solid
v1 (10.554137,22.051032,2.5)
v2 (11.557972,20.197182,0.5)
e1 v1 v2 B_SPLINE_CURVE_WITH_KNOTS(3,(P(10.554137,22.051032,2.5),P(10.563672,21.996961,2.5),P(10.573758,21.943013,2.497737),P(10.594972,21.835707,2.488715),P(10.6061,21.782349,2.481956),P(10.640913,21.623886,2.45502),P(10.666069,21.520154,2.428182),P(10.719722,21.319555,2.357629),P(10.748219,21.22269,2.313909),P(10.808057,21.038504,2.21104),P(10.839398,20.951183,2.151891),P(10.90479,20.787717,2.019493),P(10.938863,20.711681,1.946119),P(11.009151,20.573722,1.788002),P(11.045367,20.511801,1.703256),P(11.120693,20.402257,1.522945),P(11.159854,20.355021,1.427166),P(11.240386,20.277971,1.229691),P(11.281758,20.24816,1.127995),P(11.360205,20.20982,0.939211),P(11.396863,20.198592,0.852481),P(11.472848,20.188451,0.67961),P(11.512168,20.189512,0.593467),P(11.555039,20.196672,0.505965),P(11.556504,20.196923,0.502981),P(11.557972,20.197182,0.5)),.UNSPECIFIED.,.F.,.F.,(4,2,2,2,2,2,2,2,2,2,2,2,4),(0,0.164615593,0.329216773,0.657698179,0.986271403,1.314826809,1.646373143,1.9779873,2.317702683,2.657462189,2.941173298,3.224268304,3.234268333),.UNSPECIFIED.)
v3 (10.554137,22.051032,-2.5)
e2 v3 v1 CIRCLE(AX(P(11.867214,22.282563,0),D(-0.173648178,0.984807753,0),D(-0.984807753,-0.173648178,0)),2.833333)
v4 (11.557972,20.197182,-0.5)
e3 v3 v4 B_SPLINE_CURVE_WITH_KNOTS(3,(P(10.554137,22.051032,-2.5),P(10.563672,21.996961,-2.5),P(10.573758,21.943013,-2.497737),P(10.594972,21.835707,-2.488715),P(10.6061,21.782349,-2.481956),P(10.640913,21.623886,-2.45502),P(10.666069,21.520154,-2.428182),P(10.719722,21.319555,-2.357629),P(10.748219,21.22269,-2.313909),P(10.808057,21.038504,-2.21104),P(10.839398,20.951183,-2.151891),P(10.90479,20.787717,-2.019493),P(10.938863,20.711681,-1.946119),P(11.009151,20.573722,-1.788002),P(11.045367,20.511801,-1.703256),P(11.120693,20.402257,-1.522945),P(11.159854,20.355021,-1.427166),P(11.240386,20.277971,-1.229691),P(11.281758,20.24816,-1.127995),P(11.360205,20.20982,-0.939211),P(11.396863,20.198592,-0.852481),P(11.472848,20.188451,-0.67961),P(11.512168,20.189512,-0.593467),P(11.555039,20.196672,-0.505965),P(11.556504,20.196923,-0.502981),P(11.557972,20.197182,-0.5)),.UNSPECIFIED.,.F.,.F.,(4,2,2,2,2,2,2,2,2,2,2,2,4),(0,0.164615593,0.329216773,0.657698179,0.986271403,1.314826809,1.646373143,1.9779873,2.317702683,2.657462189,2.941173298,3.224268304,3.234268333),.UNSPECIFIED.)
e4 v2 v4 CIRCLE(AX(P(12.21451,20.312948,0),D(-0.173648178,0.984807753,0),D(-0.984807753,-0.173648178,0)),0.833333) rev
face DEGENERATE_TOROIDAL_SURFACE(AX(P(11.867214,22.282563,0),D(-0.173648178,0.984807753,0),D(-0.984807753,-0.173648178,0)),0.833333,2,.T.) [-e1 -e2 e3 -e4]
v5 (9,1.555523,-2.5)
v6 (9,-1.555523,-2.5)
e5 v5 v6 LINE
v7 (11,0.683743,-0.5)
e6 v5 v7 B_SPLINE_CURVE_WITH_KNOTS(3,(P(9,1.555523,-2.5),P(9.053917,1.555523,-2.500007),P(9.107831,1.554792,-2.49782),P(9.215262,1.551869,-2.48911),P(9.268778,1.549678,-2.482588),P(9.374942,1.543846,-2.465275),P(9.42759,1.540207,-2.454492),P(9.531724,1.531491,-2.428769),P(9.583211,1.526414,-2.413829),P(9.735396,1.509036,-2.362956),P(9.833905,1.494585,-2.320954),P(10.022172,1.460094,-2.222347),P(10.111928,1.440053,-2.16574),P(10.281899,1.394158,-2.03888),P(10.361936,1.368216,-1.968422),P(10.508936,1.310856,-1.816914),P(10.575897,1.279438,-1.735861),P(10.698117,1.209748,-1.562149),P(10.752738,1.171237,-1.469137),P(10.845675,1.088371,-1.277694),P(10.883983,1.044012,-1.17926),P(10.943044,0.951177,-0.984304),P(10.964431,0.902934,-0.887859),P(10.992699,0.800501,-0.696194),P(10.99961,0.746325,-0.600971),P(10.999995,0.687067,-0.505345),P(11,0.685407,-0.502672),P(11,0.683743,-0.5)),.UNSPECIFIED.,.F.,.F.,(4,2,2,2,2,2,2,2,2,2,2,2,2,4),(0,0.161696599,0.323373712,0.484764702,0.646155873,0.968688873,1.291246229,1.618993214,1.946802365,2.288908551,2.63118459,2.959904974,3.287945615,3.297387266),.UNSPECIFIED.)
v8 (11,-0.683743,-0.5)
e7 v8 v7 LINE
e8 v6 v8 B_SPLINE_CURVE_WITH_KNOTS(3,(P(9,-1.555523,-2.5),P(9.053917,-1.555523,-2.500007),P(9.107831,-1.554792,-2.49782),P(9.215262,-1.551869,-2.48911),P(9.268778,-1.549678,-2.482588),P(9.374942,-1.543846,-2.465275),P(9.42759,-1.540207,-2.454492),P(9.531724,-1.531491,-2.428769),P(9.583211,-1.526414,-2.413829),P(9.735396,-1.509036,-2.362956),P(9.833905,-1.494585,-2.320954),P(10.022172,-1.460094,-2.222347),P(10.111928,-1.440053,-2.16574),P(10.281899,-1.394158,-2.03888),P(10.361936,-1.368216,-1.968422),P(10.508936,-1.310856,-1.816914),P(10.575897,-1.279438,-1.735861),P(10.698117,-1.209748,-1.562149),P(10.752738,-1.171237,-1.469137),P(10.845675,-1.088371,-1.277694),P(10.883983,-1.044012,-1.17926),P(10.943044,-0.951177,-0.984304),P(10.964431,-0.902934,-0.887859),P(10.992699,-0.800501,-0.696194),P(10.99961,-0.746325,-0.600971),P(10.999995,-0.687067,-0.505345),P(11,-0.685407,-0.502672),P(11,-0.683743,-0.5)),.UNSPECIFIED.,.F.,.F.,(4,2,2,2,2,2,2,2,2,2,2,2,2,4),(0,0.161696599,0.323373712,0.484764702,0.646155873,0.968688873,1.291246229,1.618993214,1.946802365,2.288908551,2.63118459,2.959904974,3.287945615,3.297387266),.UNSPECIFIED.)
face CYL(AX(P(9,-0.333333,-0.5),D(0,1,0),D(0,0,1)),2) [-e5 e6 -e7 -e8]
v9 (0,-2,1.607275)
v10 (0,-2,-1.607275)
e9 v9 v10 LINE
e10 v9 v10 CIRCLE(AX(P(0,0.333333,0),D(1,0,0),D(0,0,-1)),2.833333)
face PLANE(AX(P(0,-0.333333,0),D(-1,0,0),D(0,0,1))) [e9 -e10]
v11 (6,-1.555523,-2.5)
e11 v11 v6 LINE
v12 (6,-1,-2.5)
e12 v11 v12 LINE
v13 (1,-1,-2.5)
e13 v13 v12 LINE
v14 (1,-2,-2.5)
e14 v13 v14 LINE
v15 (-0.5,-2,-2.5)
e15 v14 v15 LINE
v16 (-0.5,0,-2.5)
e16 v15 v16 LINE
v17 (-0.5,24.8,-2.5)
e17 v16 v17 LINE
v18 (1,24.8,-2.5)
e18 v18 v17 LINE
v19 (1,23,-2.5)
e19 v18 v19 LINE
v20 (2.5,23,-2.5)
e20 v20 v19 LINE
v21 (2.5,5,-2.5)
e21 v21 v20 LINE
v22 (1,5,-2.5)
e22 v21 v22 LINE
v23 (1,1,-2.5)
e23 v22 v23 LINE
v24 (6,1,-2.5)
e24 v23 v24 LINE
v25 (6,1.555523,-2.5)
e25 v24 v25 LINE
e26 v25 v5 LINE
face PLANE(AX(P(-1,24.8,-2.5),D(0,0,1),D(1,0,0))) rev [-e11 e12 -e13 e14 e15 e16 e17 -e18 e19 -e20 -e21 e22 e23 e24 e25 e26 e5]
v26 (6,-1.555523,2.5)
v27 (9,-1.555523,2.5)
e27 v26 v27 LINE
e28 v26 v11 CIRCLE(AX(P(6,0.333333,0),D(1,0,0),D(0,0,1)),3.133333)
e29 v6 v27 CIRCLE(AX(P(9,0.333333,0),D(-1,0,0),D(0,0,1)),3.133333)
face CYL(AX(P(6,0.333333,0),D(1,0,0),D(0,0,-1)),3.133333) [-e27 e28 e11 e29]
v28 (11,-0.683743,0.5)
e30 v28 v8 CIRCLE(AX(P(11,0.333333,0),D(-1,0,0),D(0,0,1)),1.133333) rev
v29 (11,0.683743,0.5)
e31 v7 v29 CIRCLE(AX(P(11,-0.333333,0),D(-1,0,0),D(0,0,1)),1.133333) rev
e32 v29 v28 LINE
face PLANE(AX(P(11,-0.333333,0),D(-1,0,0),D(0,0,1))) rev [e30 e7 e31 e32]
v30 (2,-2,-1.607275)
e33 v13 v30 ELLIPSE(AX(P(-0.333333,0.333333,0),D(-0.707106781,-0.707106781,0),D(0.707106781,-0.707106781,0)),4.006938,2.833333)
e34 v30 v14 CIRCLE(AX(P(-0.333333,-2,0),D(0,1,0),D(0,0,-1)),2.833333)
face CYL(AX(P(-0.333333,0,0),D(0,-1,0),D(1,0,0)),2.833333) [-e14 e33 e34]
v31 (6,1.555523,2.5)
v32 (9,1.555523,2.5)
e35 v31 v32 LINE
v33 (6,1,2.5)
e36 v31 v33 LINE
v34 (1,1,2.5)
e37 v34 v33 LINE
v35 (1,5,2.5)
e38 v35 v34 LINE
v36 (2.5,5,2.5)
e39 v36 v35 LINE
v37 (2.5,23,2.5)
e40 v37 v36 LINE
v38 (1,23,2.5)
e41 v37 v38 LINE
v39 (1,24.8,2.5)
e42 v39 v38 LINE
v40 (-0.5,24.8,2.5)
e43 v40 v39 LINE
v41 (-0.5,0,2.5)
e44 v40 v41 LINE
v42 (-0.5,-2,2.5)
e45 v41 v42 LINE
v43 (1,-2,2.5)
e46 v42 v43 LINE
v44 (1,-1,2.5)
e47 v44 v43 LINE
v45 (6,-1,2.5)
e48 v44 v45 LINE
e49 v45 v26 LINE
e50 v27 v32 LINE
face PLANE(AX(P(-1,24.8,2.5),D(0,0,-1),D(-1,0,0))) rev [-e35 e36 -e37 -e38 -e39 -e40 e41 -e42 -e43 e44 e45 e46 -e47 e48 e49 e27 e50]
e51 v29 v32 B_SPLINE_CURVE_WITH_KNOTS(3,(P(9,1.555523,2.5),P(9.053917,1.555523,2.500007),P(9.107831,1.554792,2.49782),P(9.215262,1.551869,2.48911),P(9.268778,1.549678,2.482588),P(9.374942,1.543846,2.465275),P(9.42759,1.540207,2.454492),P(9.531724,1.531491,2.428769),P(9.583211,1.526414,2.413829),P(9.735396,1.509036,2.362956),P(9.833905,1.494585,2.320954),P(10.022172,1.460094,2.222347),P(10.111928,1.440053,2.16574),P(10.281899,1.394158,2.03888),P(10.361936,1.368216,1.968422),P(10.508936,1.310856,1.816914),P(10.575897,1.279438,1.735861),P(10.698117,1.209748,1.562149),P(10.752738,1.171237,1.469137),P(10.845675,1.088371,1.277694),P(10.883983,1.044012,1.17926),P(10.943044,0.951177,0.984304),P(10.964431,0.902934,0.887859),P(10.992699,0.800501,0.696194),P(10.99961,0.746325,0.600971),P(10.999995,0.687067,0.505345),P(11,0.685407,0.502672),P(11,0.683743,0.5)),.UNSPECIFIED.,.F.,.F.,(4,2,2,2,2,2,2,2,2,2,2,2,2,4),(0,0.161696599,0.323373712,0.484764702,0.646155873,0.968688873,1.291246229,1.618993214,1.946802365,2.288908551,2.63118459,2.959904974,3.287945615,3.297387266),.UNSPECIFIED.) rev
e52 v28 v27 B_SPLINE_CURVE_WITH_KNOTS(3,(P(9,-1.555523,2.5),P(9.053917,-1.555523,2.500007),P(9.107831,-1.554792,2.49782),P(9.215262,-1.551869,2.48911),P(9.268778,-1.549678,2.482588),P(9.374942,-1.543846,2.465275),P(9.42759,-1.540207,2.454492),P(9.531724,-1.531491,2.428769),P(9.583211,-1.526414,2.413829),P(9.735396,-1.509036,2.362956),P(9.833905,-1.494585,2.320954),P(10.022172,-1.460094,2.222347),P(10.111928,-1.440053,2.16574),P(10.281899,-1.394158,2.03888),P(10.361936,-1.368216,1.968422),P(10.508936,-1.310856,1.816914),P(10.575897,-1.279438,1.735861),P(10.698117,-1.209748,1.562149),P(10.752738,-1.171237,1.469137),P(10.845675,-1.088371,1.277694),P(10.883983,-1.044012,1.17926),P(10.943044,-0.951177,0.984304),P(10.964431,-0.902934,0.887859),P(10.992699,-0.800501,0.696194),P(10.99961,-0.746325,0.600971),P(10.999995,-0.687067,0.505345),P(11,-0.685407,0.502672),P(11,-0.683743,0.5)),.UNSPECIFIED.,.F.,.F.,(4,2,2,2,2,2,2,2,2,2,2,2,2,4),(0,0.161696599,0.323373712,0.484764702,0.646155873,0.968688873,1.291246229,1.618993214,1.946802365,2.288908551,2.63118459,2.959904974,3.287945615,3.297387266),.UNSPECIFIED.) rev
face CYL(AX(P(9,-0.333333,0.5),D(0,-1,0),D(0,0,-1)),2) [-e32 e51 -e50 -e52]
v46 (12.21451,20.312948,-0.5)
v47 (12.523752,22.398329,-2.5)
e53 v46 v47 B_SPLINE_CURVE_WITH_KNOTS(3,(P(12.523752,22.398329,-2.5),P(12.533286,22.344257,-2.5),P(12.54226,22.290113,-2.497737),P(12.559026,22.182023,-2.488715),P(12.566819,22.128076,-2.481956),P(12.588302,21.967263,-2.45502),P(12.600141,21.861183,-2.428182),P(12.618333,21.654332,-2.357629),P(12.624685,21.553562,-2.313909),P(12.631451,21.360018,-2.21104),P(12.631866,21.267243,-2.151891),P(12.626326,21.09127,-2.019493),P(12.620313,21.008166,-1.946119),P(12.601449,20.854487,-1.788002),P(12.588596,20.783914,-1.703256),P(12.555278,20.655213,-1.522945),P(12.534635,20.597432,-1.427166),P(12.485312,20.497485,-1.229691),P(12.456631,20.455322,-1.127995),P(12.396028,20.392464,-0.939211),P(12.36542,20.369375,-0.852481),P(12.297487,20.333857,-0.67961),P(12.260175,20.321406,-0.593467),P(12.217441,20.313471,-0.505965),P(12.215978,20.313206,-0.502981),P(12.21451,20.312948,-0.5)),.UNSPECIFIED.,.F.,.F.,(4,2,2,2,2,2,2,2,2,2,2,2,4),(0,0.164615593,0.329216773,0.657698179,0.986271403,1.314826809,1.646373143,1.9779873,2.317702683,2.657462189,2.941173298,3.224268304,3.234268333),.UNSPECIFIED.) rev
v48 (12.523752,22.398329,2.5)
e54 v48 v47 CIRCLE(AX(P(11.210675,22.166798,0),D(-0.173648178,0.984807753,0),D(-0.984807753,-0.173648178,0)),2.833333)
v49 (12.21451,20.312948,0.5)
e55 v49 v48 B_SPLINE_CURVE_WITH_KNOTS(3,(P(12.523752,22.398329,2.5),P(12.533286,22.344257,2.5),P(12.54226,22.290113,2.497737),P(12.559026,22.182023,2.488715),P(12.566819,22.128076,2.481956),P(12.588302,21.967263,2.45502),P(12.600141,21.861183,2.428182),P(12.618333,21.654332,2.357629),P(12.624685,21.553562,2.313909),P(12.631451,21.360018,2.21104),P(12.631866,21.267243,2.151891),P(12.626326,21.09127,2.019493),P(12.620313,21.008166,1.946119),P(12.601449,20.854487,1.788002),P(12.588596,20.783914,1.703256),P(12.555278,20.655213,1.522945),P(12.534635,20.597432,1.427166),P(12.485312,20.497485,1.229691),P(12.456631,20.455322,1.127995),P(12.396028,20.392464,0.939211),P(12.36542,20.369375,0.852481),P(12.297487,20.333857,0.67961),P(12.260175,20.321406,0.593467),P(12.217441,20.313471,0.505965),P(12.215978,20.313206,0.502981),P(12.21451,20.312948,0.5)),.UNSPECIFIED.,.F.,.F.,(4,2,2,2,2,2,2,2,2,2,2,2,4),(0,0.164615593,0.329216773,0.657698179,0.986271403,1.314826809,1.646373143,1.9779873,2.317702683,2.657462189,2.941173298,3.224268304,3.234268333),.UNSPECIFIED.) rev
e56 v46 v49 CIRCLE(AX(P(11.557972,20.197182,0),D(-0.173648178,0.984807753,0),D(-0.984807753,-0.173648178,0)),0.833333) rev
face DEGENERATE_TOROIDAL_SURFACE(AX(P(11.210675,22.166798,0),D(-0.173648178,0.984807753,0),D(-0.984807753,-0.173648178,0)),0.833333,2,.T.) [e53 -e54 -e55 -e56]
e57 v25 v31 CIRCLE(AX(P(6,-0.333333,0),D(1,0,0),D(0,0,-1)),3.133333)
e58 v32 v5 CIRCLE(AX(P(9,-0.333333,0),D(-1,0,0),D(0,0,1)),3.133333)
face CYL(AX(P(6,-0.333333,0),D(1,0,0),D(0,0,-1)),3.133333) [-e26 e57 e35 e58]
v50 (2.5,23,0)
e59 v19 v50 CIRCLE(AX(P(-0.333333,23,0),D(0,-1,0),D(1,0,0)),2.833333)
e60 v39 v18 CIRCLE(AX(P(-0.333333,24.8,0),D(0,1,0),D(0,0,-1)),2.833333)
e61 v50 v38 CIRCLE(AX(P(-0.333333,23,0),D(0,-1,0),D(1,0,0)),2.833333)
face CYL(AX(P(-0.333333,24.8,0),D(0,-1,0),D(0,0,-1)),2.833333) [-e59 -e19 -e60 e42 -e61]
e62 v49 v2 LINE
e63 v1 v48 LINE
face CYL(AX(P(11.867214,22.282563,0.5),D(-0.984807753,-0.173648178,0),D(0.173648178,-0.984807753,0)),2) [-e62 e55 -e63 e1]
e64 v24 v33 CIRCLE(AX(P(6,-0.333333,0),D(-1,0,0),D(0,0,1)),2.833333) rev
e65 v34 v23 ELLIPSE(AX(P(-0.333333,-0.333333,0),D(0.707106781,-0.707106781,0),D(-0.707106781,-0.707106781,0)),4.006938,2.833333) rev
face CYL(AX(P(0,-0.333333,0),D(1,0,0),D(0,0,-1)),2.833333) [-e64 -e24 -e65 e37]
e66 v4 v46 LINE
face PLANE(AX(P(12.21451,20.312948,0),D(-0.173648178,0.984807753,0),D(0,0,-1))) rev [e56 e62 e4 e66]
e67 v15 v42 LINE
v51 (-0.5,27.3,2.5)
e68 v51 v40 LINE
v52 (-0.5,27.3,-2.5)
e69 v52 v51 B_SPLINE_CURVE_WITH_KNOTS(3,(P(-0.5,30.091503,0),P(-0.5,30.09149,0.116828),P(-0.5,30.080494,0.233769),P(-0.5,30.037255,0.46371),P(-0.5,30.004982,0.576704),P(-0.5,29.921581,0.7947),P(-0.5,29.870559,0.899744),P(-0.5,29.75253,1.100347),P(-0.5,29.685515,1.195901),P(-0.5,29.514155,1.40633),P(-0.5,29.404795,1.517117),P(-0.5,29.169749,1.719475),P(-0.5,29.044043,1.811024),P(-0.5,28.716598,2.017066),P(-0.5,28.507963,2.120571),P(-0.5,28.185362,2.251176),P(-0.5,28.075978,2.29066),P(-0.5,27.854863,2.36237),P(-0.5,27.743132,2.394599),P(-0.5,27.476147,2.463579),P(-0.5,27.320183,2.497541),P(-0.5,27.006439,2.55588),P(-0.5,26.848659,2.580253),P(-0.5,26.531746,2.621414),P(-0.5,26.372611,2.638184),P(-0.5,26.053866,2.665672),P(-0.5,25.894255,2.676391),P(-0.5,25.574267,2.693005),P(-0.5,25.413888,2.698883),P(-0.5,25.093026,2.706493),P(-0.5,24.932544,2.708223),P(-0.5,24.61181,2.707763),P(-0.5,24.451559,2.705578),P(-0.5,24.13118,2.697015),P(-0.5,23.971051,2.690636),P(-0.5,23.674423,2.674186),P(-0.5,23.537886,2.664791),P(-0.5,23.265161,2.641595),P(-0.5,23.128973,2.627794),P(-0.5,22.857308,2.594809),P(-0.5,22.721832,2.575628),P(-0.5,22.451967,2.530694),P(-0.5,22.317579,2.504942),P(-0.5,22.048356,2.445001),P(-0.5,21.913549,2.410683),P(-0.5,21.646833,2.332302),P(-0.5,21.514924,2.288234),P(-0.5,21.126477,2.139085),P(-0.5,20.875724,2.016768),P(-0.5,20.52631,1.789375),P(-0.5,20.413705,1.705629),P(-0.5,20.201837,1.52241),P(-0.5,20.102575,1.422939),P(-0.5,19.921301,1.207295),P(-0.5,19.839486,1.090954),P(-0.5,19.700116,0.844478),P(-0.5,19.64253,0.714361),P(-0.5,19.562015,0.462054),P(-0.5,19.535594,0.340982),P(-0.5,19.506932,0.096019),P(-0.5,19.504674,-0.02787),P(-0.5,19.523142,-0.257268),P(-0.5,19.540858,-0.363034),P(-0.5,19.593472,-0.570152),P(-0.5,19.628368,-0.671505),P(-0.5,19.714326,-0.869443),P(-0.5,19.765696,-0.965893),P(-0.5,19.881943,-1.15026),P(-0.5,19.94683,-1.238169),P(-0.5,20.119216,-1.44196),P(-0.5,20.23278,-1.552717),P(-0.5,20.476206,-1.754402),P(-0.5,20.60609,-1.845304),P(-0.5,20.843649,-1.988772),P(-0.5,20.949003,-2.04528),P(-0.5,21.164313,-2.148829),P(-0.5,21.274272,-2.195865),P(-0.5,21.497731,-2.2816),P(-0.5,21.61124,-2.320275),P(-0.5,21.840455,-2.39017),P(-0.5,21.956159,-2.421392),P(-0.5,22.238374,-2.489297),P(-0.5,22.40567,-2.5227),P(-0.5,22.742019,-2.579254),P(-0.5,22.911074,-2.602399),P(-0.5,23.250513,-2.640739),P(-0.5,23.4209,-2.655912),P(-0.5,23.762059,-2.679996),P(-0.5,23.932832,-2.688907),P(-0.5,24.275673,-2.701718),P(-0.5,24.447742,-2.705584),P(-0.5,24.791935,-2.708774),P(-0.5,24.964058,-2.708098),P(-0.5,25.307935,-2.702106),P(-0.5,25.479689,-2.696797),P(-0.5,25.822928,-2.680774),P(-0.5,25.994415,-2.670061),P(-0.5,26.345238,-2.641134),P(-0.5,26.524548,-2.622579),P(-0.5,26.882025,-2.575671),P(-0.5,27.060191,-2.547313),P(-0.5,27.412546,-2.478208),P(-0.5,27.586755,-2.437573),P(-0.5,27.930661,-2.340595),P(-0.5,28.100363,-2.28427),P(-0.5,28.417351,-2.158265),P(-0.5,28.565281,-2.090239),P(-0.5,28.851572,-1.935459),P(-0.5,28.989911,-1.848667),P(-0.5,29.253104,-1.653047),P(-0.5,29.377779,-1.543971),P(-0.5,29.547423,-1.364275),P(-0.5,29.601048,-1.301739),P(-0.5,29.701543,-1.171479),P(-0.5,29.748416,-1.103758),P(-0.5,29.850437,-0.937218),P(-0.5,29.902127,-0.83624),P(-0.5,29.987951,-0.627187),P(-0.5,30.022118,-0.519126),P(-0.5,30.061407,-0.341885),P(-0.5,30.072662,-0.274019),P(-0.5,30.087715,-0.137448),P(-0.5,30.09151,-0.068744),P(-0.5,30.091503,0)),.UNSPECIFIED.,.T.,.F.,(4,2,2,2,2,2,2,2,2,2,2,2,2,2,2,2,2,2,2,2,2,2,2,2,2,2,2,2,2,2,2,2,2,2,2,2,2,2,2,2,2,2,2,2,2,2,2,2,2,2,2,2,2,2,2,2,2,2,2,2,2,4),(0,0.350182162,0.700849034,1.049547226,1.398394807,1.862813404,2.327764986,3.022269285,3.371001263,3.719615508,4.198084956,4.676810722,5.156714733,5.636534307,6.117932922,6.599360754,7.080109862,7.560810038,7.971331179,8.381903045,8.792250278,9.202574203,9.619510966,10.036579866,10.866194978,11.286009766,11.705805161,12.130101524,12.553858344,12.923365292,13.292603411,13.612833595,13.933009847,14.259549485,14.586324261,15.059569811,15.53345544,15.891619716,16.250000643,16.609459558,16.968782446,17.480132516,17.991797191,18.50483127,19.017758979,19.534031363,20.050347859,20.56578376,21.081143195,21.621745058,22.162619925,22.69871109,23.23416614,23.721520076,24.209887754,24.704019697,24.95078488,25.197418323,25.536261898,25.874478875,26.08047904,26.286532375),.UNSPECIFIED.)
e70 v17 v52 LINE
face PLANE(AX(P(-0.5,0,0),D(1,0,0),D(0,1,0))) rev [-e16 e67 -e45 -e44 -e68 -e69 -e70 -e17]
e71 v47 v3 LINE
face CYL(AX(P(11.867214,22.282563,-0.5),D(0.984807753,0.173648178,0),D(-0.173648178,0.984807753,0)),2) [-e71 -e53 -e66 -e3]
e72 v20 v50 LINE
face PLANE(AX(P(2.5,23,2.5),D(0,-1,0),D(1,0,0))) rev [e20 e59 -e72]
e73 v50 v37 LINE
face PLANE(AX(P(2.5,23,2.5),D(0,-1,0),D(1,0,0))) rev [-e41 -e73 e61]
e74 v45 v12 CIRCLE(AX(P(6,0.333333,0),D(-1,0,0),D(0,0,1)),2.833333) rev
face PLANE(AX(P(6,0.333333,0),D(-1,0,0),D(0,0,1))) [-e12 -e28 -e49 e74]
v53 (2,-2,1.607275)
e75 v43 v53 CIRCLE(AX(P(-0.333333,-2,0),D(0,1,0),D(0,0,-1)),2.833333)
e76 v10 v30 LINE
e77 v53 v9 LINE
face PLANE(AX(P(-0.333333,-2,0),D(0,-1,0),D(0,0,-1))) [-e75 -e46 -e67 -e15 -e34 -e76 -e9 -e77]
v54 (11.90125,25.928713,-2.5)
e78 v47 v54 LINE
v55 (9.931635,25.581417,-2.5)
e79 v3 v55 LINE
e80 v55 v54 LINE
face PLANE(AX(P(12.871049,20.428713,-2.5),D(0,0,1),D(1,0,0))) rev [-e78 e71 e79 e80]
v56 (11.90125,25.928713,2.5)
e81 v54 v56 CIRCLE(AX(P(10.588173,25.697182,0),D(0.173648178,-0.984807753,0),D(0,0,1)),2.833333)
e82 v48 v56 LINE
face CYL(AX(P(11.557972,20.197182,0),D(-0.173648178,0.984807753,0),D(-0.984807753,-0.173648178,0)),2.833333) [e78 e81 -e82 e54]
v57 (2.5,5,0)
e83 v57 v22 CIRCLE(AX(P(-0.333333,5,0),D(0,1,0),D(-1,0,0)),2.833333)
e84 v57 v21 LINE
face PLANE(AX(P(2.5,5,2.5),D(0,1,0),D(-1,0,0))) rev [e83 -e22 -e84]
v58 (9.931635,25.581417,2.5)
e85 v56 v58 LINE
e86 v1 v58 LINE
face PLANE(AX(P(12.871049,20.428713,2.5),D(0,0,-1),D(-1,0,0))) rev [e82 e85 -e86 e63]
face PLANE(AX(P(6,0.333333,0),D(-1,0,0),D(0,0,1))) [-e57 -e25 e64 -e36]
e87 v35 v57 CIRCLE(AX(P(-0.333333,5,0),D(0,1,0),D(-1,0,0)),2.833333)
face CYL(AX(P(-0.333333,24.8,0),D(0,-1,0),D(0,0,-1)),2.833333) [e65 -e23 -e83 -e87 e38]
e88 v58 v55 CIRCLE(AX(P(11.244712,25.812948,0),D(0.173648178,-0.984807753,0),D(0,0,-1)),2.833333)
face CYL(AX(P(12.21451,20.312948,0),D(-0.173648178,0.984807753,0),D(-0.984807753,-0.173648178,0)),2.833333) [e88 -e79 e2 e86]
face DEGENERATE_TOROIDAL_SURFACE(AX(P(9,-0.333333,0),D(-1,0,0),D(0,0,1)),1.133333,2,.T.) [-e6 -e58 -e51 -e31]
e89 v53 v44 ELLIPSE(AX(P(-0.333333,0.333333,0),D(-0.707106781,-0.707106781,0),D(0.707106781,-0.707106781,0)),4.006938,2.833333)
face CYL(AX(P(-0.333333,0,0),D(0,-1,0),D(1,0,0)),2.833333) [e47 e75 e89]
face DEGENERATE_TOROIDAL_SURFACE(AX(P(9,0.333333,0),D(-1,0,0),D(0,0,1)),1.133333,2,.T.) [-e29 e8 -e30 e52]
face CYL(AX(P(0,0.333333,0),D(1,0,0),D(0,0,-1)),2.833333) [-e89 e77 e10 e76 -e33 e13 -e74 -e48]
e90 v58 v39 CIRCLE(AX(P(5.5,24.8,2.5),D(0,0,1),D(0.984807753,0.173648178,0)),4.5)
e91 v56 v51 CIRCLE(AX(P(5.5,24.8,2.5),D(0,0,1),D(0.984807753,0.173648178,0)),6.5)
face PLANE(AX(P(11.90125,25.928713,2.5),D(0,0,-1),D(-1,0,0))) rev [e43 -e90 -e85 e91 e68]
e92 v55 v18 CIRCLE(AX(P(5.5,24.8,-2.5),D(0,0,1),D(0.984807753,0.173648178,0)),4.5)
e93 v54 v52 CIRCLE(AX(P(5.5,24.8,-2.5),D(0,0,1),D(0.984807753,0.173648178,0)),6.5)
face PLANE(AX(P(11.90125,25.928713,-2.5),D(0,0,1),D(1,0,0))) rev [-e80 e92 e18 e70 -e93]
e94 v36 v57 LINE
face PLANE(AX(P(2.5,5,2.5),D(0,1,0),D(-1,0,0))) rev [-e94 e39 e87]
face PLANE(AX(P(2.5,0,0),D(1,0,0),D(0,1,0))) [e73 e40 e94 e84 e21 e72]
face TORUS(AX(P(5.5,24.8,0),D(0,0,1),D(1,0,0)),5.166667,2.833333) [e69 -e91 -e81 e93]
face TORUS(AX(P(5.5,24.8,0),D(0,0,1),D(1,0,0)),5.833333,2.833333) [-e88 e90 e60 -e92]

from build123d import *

# Parameters (mm, degrees)
EXTRUDE_1_DEPTH     = 5
SKETCH_19_W         = 5
SKETCH_19_H         = 18
EXTRUDE_2_DEPTH     = 1.5
FILLET_2_R          = 2
SKETCH_20_W         = 8
SKETCH_20_H         = 40
CUT_EXTRUDE_1_DEPTH = 36.961786675


with BuildPart() as part:
    # 扫描2: sweep along a path in 草图1
    with BuildLine(Plane.XY) as sweep_2_path:
        Line((11.886241035, 20.255064977), (10.916442642, 25.755064977))
        ThreePointArc((10.916442642, 25.755064977), (5.020643415, 30.27907084), (0, 24.8))
        Line((0, 24.8), (0, 0))
        Line((0, 0), (0, -2))
    # 草图13 → 扫描2 (sweep)
    with BuildSketch(Plane(origin=(0, -2, 0), x_dir=(1, 0, 0), z_dir=(0, 1, 0))):
        with BuildLine():
            Line((-1, -2.5), (1, -2.5))
            ThreePointArc((1, -2.5), (2.5, 0), (1, 2.5))
            Line((1, 2.5), (-1, 2.5))
            ThreePointArc((-1, 2.5), (-2.5, 0), (-1, -2.5))
        make_face()
    sweep(path=sweep_2_path.line)

    # 扫描4: sweep along a path in 草图15
    with BuildLine(Plane.XY) as sweep_4_path:
        Line((0, 0), (11, 0))
    # 草图16 → 扫描4 (sweep)
    with BuildSketch(Plane(origin=(11, 0, 0), x_dir=(0, 0, -1), z_dir=(1, 0, 0))):
        with BuildLine():
            Line((-2.5, -1), (-2.5, 1))
            ThreePointArc((-2.5, 1), (0, 2.5), (2.5, 1))
            Line((2.5, 1), (2.5, -1))
            ThreePointArc((2.5, -1), (0, -2.5), (-2.5, -1))
        make_face()
    sweep(path=sweep_4_path.line)

    # 草图17 → 凸台-拉伸1 (add)
    with BuildSketch(Plane(origin=(11, 0, 0), x_dir=(0, 0, -1), z_dir=(1, 0, 0))):
        with BuildLine():
            Line((-2.5, 1.555522876), (-2.5, -1.555522876))
            ThreePointArc((-2.5, -1.555522876), (0, -2.8), (2.5, -1.555522876))
            Line((2.5, -1.555522876), (2.5, 1.555522876))
            ThreePointArc((2.5, 1.555522876), (0, 2.8), (-2.5, 1.555522876))
        make_face()
    extrude(amount=-EXTRUDE_1_DEPTH)

    # 草图19 → 凸台-拉伸2 (add)
    with BuildSketch(Plane(origin=(1, 0, 0), x_dir=(0, 0, -1), z_dir=(1, 0, 0))):
        with Locations((0, 14)):
            Rectangle(SKETCH_19_W, SKETCH_19_H)
    extrude(amount=EXTRUDE_2_DEPTH)

    # 圆角2
    # the kernel refuses this fillet: 2 mm, written as the material it takes off along each edge
    with BuildSketch(Plane(origin=(17.795087554, 21.296954043, 2.5), x_dir=(0, 0, -1), z_dir=(-0.9848077530122092, -0.17364817766692373, 0))) as fillet_2_piece_1:
        with BuildLine():
            CenterArc((FILLET_2_R, -FILLET_2_R), FILLET_2_R, 90, 90)
            Line((0, -FILLET_2_R), (0, 0))
            Line((0, 0), (FILLET_2_R, 0))
        make_face()
    extrude(amount=12, mode=Mode.SUBTRACT)
    with BuildSketch(Plane(origin=(12.214510286, 20.312947703, 0), x_dir=(0.9423506208781959, 0.16616183974819204, -0.29045748456869663), z_dir=(0.2860447827236766, 0.05043741288507259, 0.9568878981667733))) as fillet_2_piece_2:
        with BuildLine():
            CenterArc((2.833333333 - FILLET_2_R, FILLET_2_R), FILLET_2_R, 270, 90)
            Line((2.833333333 - FILLET_2_R, 0), (2.833333333, 0))
            Line((2.833333333, 0), (2.833333333, FILLET_2_R))
        make_face()
    revolve(axis=Axis((12.214510286, 20.312947703, 0), (-0.173648177666923, 0.9848077530122094, 0)), revolution_arc=326.229306127, mode=Mode.SUBTRACT)
    with BuildSketch(Plane(origin=(5.977394517, 19.213175911, -2.5), x_dir=(-0.17364817766692373, 0.9848077530122092, 0), z_dir=(0.9848077530122092, 0.17364817766692373, 0))) as fillet_2_piece_3:
        with BuildLine():
            CenterArc((FILLET_2_R, FILLET_2_R), FILLET_2_R, 180, 90)
            Line((0, FILLET_2_R), (0, 0))
            Line((0, 0), (FILLET_2_R, 0))
        make_face()
    extrude(amount=12, mode=Mode.SUBTRACT)
    with BuildSketch(Plane(origin=(11, -6.555522876, 2.5), x_dir=(0, 0, -1), z_dir=(0, 1, 0))) as fillet_2_piece_4:
        with BuildLine():
            CenterArc((FILLET_2_R, FILLET_2_R), FILLET_2_R, 180, 90)
            Line((0, FILLET_2_R), (0, 0))
            Line((0, 0), (FILLET_2_R, 0))
        make_face()
    extrude(amount=13.111045751, mode=Mode.SUBTRACT)
    with BuildSketch(Plane(origin=(11, 6.555522876, -2.5), x_dir=(-1, 0, 0), z_dir=(0, -1, 0))) as fillet_2_piece_5:
        with BuildLine():
            CenterArc((FILLET_2_R, -FILLET_2_R), FILLET_2_R, 90, 90)
            Line((0, -FILLET_2_R), (0, 0))
            Line((0, 0), (FILLET_2_R, 0))
        make_face()
    extrude(amount=13.111045751, mode=Mode.SUBTRACT)
    with BuildSketch(Plane(origin=(11, -0.333333333, 0), x_dir=(0, -0.8131785022115455, -0.582014367125922), z_dir=(0, -0.582014367125922, 0.8131785022115455))) as fillet_2_piece_6:
        with BuildLine():
            CenterArc((3.133333333 - FILLET_2_R, -FILLET_2_R), FILLET_2_R, 0, 90)
            Line((3.133333333, -FILLET_2_R), (3.133333333, 0))
            Line((3.133333333, 0), (3.133333333 - FILLET_2_R, 0))
        make_face()
    revolve(axis=Axis((11, -0.333333333, 0), (1, 0, 0)), revolution_arc=288.815304863, mode=Mode.SUBTRACT)
    with BuildSketch(Plane(origin=(11, 0.333333333, 0), x_dir=(0, 0.8131785022115376, 0.5820143671259329), z_dir=(0, 0.5820143671259329, -0.8131785022115376))) as fillet_2_piece_7:
        with BuildLine():
            CenterArc((3.133333333 - FILLET_2_R, -FILLET_2_R), FILLET_2_R, 0, 90)
            Line((3.133333333 - FILLET_2_R, 0), (3.133333333, 0))
            Line((3.133333333, 0), (3.133333333, -FILLET_2_R))
        make_face()
    revolve(axis=Axis((11, 0.333333333, 0), (1, 0, 0)), revolution_arc=288.815304863, mode=Mode.SUBTRACT)
    with BuildSketch(Plane(origin=(11.557971784, 20.197182251, 0), x_dir=(-0.9423506208781961, -0.16616183974819207, 0.2904574845686964), z_dir=(-0.2860447827236764, -0.05043741288507257, -0.9568878981667737))) as fillet_2_piece_8:
        with BuildLine():
            CenterArc((2.833333333 - FILLET_2_R, FILLET_2_R), FILLET_2_R, 270, 90)
            Line((2.833333333, FILLET_2_R), (2.833333333, 0))
            Line((2.833333333, 0), (2.833333333 - FILLET_2_R, 0))
        make_face()
    revolve(axis=Axis((11.557971784, 20.197182251, 0), (-0.17364817766692306, 0.9848077530122095, 0)), revolution_arc=326.229306127, mode=Mode.SUBTRACT)

    # 草图20 → 切除-拉伸1 (cut, through all)
    with BuildSketch(Plane(origin=(-0.5, 0, 0), x_dir=(0, 0, -1), z_dir=(1, 0, 0))):
        with Locations((0, 16)):
            Rectangle(SKETCH_20_W, SKETCH_20_H)
    extrude(amount=-CUT_EXTRUDE_1_DEPTH, mode=Mode.SUBTRACT)


solid = part.part
